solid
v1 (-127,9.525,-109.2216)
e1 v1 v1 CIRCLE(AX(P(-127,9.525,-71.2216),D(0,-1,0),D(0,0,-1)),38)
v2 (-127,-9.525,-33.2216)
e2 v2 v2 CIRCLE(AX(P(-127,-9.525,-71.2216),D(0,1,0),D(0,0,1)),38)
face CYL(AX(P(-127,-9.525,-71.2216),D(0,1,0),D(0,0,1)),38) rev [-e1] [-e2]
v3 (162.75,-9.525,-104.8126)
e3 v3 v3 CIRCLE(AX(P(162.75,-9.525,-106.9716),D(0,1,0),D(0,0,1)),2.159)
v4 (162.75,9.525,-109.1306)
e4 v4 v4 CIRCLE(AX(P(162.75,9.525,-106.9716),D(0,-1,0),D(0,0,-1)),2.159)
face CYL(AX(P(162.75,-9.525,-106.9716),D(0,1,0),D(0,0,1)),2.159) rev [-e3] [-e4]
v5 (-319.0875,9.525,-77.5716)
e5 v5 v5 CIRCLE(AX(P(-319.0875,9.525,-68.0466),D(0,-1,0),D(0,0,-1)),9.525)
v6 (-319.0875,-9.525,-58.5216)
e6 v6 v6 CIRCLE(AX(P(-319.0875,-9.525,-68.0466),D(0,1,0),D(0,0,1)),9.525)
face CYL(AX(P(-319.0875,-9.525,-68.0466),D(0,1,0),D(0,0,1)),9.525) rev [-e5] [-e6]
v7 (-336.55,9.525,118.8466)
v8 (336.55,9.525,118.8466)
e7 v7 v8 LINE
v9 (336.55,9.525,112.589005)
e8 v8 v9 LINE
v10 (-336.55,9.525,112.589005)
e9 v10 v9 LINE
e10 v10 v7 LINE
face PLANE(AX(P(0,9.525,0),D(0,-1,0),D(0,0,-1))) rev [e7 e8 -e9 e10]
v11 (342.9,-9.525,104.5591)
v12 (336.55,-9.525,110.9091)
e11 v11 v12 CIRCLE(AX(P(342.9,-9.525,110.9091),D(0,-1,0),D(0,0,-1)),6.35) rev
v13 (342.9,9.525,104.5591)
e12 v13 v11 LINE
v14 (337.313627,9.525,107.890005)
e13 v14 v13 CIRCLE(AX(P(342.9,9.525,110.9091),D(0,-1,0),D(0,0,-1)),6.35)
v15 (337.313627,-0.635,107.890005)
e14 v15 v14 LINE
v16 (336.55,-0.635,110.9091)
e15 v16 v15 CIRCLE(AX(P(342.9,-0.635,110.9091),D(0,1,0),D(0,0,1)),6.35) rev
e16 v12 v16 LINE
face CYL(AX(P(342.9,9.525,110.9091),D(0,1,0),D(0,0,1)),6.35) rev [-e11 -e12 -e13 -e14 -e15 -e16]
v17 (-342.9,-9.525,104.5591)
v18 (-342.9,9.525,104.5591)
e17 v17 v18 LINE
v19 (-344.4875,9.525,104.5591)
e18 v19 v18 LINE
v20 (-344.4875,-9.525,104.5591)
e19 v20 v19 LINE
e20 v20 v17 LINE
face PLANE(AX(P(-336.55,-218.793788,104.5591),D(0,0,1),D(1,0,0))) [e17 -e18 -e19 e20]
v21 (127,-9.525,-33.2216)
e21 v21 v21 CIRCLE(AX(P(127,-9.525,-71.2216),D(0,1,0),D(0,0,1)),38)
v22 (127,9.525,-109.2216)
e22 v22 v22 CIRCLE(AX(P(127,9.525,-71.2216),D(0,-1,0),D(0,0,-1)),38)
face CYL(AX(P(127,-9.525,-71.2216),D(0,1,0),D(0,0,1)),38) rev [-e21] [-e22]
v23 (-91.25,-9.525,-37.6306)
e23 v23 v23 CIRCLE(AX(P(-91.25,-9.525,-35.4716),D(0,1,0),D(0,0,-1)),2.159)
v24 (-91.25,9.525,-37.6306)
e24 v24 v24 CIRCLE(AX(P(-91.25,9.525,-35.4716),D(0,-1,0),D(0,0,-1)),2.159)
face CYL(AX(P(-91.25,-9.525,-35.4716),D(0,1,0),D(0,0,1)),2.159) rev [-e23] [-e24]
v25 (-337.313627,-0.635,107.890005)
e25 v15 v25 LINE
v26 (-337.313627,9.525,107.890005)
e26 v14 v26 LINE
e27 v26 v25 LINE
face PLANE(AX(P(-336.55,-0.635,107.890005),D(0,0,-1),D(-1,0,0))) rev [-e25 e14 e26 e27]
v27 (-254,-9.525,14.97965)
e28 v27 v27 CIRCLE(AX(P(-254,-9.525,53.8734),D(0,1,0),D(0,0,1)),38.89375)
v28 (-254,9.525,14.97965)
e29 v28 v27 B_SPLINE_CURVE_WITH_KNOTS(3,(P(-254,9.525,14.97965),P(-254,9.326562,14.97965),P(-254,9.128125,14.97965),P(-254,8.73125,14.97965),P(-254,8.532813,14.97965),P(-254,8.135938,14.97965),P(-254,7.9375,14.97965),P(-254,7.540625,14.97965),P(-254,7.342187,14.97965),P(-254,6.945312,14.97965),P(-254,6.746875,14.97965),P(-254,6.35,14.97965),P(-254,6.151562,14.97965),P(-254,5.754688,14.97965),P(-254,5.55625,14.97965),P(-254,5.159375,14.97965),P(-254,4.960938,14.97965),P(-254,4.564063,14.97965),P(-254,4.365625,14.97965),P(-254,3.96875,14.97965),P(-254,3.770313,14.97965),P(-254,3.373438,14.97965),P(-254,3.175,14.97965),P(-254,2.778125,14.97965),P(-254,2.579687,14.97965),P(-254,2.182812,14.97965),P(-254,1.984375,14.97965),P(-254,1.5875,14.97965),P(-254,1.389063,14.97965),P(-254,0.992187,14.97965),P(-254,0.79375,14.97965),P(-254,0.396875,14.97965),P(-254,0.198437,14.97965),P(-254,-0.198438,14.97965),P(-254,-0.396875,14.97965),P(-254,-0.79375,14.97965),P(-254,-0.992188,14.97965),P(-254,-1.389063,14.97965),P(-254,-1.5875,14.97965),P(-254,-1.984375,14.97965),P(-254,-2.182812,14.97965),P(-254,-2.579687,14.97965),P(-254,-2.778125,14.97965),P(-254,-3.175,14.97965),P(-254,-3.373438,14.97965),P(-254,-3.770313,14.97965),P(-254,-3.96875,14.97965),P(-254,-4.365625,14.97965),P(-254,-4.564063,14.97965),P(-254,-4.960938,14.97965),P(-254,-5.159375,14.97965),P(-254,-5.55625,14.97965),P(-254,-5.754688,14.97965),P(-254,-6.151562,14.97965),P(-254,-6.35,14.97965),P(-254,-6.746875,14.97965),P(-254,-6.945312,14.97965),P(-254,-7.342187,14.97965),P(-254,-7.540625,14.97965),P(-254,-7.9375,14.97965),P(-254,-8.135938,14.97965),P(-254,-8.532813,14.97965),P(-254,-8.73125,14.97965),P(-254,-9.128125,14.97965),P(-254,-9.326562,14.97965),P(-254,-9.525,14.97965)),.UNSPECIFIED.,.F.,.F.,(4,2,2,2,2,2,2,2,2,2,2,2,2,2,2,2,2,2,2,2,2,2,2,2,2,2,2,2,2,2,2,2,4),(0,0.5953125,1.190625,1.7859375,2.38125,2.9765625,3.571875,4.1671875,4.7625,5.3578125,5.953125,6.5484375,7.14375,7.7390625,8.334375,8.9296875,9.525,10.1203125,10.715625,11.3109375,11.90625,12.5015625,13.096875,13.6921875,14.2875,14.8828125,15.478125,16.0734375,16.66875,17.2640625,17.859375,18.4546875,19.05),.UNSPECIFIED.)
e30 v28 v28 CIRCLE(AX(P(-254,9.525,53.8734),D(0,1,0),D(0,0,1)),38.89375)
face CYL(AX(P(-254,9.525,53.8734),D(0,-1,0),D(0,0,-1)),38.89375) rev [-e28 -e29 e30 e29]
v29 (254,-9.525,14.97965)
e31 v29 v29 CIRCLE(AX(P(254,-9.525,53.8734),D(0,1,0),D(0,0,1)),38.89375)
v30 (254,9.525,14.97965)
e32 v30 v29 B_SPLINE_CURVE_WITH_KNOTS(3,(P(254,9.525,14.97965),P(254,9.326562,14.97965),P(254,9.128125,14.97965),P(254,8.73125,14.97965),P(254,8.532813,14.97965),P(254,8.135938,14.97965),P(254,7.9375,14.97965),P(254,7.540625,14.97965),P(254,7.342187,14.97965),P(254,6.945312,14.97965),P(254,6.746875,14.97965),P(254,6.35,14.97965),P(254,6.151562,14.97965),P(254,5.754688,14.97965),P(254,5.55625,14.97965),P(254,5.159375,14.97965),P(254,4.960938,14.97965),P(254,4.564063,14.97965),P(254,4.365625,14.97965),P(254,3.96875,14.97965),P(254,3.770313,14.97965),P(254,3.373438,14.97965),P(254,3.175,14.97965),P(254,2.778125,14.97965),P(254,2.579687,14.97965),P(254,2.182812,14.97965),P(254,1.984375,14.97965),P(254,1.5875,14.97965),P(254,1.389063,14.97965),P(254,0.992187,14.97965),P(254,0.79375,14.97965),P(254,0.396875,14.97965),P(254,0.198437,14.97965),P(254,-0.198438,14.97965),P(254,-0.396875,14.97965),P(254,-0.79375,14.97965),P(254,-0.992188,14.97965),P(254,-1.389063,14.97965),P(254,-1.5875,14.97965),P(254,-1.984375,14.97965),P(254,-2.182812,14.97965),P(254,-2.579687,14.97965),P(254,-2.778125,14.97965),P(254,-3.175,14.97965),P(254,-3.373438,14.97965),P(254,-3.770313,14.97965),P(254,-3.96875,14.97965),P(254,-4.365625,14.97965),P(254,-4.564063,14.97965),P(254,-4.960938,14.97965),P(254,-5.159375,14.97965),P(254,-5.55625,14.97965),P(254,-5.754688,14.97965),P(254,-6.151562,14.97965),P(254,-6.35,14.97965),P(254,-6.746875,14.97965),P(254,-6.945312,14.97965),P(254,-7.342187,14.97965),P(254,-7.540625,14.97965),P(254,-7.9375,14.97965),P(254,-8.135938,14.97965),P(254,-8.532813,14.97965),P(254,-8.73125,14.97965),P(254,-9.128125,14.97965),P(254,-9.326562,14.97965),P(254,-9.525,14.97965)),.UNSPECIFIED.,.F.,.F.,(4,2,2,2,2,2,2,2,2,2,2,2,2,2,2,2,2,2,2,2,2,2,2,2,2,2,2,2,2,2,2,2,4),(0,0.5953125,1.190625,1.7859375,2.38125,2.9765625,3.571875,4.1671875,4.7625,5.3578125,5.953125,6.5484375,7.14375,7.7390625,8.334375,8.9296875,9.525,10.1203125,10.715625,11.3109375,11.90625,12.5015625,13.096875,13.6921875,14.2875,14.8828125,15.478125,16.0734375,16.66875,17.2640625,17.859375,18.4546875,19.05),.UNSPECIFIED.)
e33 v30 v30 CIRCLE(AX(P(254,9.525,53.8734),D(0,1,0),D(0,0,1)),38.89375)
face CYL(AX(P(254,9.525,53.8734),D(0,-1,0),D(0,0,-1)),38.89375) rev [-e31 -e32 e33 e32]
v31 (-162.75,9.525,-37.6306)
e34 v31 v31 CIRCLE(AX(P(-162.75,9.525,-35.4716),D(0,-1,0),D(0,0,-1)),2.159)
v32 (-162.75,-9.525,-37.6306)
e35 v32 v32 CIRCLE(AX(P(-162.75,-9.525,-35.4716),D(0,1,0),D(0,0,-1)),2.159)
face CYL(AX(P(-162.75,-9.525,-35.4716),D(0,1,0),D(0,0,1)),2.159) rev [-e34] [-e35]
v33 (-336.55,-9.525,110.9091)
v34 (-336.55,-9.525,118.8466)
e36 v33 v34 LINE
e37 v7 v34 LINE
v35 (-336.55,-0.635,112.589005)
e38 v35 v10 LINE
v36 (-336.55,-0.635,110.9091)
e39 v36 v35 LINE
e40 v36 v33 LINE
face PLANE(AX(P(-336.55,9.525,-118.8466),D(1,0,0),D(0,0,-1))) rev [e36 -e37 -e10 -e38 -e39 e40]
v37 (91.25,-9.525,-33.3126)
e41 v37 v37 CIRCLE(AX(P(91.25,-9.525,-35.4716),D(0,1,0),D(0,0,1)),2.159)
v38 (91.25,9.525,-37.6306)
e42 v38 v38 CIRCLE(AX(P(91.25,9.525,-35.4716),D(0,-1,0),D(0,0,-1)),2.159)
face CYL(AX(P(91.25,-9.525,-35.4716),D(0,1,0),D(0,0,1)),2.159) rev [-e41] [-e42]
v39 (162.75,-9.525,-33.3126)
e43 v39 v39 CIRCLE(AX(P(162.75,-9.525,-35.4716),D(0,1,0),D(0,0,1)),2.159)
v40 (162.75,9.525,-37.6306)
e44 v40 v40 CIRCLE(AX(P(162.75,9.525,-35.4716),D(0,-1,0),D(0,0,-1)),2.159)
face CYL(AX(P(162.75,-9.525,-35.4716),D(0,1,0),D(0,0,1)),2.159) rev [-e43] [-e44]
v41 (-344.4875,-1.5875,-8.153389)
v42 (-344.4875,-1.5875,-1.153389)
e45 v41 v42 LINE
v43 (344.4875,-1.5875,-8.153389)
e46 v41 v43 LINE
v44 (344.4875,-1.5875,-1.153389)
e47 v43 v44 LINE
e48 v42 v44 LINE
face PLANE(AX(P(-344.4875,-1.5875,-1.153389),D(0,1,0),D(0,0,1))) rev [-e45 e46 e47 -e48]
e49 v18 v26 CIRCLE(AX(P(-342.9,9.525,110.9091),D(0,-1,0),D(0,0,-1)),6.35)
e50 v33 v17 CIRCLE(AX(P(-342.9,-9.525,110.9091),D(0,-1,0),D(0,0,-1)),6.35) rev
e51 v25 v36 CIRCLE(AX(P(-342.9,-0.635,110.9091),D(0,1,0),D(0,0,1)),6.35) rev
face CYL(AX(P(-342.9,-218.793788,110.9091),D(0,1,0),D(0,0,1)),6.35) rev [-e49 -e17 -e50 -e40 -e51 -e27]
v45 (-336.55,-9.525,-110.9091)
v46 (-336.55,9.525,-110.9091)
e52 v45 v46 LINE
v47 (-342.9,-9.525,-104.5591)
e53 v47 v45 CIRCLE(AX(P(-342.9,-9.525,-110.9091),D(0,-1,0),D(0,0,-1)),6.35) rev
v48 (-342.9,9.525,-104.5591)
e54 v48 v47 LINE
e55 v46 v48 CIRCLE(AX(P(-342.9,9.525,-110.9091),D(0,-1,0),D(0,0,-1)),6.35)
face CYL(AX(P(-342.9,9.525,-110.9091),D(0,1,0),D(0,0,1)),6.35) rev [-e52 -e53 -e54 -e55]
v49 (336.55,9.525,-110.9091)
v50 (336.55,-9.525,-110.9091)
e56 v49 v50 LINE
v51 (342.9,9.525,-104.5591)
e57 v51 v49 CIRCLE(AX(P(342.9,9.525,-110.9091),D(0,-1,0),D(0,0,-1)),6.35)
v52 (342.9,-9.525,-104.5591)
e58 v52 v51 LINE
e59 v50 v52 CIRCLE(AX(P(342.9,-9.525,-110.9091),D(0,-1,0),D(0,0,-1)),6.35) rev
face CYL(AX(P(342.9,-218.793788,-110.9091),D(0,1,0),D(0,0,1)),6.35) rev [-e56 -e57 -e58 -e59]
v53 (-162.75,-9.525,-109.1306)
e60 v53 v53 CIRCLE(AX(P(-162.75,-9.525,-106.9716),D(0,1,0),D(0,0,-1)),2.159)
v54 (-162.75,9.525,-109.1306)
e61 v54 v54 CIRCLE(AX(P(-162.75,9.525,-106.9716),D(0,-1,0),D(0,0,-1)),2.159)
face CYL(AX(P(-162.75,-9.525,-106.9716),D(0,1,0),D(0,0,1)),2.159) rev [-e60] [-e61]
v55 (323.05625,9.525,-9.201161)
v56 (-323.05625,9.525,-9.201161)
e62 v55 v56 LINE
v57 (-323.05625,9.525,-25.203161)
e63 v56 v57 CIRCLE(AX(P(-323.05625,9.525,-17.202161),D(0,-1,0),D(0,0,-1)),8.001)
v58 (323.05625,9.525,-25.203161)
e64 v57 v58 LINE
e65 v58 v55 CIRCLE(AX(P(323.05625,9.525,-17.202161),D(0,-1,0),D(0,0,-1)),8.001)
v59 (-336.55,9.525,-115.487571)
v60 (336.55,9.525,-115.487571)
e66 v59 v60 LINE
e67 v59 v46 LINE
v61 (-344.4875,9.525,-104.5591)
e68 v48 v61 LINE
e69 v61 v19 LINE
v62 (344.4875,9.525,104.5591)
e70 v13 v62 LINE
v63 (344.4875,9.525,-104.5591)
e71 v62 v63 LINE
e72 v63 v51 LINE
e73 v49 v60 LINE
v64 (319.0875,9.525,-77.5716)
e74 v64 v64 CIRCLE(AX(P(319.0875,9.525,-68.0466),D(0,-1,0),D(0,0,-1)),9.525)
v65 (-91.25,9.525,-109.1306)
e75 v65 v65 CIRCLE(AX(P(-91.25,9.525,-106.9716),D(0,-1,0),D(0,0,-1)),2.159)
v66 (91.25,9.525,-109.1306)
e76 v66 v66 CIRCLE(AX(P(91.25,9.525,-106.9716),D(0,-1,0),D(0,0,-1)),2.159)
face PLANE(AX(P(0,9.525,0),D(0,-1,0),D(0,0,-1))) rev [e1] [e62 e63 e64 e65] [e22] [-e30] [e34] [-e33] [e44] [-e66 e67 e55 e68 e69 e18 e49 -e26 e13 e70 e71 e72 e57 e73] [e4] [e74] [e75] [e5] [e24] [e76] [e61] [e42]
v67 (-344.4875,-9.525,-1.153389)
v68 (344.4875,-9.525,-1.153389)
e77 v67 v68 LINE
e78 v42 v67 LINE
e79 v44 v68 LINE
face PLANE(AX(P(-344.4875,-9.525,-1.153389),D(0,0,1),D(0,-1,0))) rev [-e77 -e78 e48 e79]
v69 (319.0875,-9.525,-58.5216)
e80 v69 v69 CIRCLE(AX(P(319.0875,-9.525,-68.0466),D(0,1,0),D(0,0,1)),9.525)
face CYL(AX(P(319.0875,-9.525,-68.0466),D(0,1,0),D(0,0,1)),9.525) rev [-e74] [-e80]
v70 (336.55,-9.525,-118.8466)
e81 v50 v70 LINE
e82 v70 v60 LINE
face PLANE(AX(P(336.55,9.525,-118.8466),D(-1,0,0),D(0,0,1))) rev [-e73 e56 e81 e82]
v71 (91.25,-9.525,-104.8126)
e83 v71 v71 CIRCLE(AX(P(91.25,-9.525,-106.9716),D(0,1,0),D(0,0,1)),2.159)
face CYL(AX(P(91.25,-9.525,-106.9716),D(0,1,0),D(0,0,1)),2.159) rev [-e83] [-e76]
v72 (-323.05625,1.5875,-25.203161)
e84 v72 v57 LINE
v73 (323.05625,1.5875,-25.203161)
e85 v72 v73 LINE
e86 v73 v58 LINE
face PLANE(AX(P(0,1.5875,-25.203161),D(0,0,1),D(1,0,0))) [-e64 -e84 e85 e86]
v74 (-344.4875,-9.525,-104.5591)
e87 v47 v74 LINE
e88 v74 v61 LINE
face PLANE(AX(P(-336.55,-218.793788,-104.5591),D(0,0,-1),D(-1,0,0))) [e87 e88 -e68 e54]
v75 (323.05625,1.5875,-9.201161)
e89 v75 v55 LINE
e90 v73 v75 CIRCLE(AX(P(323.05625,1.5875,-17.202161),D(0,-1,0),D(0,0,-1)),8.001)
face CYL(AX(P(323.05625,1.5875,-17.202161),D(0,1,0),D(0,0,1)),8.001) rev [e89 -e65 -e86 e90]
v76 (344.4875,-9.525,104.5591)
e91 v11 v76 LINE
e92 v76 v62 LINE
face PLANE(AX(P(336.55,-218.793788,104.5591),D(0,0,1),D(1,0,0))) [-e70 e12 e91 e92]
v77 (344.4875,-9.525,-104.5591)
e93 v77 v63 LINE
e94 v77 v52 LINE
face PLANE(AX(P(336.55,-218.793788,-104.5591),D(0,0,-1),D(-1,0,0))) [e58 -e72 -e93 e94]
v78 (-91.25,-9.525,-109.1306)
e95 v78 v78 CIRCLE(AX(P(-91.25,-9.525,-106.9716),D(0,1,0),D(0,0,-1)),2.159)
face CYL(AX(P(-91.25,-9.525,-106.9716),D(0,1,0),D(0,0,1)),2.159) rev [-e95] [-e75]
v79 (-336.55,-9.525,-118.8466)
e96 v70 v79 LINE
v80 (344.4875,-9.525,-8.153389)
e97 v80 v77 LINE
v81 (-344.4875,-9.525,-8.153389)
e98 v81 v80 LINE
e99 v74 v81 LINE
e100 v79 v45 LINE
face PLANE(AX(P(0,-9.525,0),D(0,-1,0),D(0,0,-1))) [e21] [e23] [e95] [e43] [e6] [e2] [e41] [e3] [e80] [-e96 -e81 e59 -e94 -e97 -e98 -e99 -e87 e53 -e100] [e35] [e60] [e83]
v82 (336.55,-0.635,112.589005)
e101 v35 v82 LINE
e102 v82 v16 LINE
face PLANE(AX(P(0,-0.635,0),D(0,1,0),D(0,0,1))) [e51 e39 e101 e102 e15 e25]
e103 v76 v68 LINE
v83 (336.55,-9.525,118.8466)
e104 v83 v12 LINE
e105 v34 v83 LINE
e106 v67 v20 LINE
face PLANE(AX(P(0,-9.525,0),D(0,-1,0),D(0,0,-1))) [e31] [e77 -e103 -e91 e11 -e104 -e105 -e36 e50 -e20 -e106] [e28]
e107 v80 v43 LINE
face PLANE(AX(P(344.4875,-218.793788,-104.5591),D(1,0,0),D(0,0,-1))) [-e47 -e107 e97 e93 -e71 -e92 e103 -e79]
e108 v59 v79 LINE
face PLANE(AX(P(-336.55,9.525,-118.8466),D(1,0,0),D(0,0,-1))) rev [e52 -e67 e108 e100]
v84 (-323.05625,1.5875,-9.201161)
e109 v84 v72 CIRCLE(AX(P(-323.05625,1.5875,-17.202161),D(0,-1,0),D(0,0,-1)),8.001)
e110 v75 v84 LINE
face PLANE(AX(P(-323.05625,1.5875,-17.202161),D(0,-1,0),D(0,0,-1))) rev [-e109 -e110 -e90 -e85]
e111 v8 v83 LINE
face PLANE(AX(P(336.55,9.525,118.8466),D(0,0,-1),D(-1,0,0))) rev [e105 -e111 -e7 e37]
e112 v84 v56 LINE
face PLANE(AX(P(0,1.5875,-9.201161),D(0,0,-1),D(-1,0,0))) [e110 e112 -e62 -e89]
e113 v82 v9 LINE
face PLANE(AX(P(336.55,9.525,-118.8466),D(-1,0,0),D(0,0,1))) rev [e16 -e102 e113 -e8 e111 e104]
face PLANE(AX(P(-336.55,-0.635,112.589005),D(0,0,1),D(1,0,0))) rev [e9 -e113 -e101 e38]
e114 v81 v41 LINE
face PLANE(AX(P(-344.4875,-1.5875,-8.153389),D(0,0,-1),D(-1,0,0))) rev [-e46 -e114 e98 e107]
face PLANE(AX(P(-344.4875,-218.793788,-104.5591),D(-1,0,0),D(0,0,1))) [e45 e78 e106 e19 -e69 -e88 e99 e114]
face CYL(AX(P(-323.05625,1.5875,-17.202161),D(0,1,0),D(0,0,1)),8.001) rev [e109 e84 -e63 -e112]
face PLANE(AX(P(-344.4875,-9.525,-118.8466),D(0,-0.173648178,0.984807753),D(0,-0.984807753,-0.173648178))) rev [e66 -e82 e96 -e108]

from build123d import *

# Parameters (mm, degrees)
SKETCH1_W               = 673.1
SKETCH1_H               = 237.6932
SKETCH1_R               = 38.89375
BOSS_EXTRUDE1_DEPTH     = 9.525
SKETCH2_W               = 673.1
SKETCH2_H               = 4.699
CUT_EXTRUDE1_DEPTH      = 10.16
SKETCH3_W               = 7.9375
SKETCH3_H               = 209.1182
BOSS_EXTRUDE2_DEPTH     = 19.05
FILLET1_R               = 6.35
CUT_EXTRUDE2_DEPTH      = 692.395195502
CUT_EXTRUDE2_DEPTH_BACK = 692.395195502
CUT_EXTRUDE3_START      = -19.05
CUT_EXTRUDE3_DEPTH      = 7.9375
CUT_EXTRUDE4_DEPTH      = 365.9096525
CUT_EXTRUDE4_DEPTH_BACK = 365.9096525
SKETCH6_R               = 9.525
SKETCH6_R_2             = 38
SKETCH6_R_3             = 2.159
CUT_EXTRUDE5_DEPTH      = 365.536524388
CUT_EXTRUDE5_DEPTH_BACK = 365.536524388
SKETCH8_W               = 7
SKETCH8_H               = 7.9375


with BuildPart() as part:
    # Sketch1 → Boss-Extrude1 (new, symmetric)
    with BuildSketch(Plane(origin=(0, 0, 0), x_dir=(1, 0, 0), z_dir=(0, 1, 0))):
        Rectangle(SKETCH1_W, SKETCH1_H)
        with Locations(Location((-254, -53.8734, 0), (0, 0, 90))):
            Circle(SKETCH1_R, mode=Mode.SUBTRACT)
        with Locations(Location((254, -53.8734, 0), (0, 0, 90))):
            Circle(SKETCH1_R, mode=Mode.SUBTRACT)
    extrude(amount=BOSS_EXTRUDE1_DEPTH, both=True)

    # Sketch2 → Cut-Extrude1 (cut)
    with BuildSketch(Plane(origin=(0, 9.525, 0), x_dir=(1, 0, 0), z_dir=(0, 1, 0))):
        with Locations((0, -110.2395052)):
            Rectangle(SKETCH2_W, SKETCH2_H)
    extrude(amount=-CUT_EXTRUDE1_DEPTH, mode=Mode.SUBTRACT)

    # Sketch3 → Boss-Extrude2 (add)
    with BuildSketch(Plane(origin=(0, 9.525, 0), x_dir=(1, 0, 0), z_dir=(0, 1, 0))):
        with Locations((-340.51875, 0)):
            Rectangle(SKETCH3_W, SKETCH3_H)
        with Locations((340.51875, 0)):
            Rectangle(SKETCH3_W, SKETCH3_H)
    extrude(amount=-BOSS_EXTRUDE2_DEPTH)

    # Fillet1
    # the kernel refuses this fillet: 6.35 mm, written as the material it adds along each edge
    with BuildSketch(Plane(origin=(336.55, 9.525, -104.5591), x_dir=(0, 0, -1), z_dir=(0, -1, 0))) as fillet1_piece_1:
        with BuildLine():
            CenterArc((FILLET1_R, FILLET1_R), FILLET1_R, 180, 90)
            Line((0, FILLET1_R), (0, 0))
            Line((0, 0), (FILLET1_R, 0))
        make_face()
    extrude(amount=19.05)
    with BuildSketch(Plane(origin=(336.55, 9.525, 104.5591), x_dir=(0, 0, 1), z_dir=(0, -1, 0))) as fillet1_piece_2_section:
        with BuildLine():
            CenterArc((FILLET1_R, -FILLET1_R), FILLET1_R, 90, 90)
            Line((0, -FILLET1_R), (0, 0))
            Line((0, 0), (FILLET1_R, 0))
        make_face()
    fillet1_piece_2 = extrude(amount=19.05, mode=Mode.PRIVATE)
    fillet1_piece_2 = split(fillet1_piece_2, bisect_by=Plane(origin=(338.149651187, -0.635, 105.638113303), z_dir=(0, 1, 0)), keep=Keep.TOP, mode=Mode.PRIVATE)
    fillet1_piece_2 = split(fillet1_piece_2, bisect_by=Plane(origin=(338.149651187, 4.445, 107.8900052), z_dir=(0, 0, -1)), keep=Keep.TOP, mode=Mode.PRIVATE)
    add(fillet1_piece_2)
    with BuildSketch(Plane(origin=(336.55, 9.525, 104.5591), x_dir=(0, 0, 1), z_dir=(0, -1, 0))) as fillet1_piece_3_section:
        with BuildLine():
            CenterArc((FILLET1_R, -FILLET1_R), FILLET1_R, 90, 90)
            Line((0, -FILLET1_R), (0, 0))
            Line((0, 0), (FILLET1_R, 0))
        make_face()
    fillet1_piece_3 = extrude(amount=19.05, mode=Mode.PRIVATE)
    fillet1_piece_3 = split(fillet1_piece_3, bisect_by=Plane(origin=(336.678320254, -0.635, 108.894134697), z_dir=(0, -1, 0)), keep=Keep.TOP, mode=Mode.PRIVATE)
    fillet1_piece_3 = split(fillet1_piece_3, bisect_by=Plane(origin=(336.678320254, -5.08, 107.8900052), z_dir=(0, 0, 1)), keep=Keep.TOP, mode=Mode.PRIVATE)
    add(fillet1_piece_3)
    with BuildSketch(Plane(origin=(336.55, 9.525, 104.5591), x_dir=(0, 0, 1), z_dir=(0, -1, 0))) as fillet1_piece_4_section:
        with BuildLine():
            CenterArc((FILLET1_R, -FILLET1_R), FILLET1_R, 90, 90)
            Line((0, -FILLET1_R), (0, 0))
            Line((0, 0), (FILLET1_R, 0))
        make_face()
    fillet1_piece_4 = extrude(amount=19.05, mode=Mode.PRIVATE)
    fillet1_piece_4 = split(fillet1_piece_4, bisect_by=Plane(origin=(338.149651187, -0.635, 105.638113303), z_dir=(0, -1, 0)), keep=Keep.TOP, mode=Mode.PRIVATE)
    fillet1_piece_4 = split(fillet1_piece_4, bisect_by=Plane(origin=(338.149651187, -5.08, 107.8900052), z_dir=(0, 0, -1)), keep=Keep.TOP, mode=Mode.PRIVATE)
    add(fillet1_piece_4)
    with BuildSketch(Plane(origin=(-336.55, 9.525, -104.5591), x_dir=(0, 0, -1), z_dir=(0, -1, 0))) as fillet1_piece_5:
        with BuildLine():
            CenterArc((FILLET1_R, -FILLET1_R), FILLET1_R, 90, 90)
            Line((0, -FILLET1_R), (0, 0))
            Line((0, 0), (FILLET1_R, 0))
        make_face()
    extrude(amount=19.05)
    with BuildSketch(Plane(origin=(-336.55, 9.525, 104.5591), x_dir=(0, 0, 1), z_dir=(0, -1, 0))) as fillet1_piece_6_section:
        with BuildLine():
            CenterArc((FILLET1_R, FILLET1_R), FILLET1_R, 180, 90)
            Line((0, FILLET1_R), (0, 0))
            Line((0, 0), (FILLET1_R, 0))
        make_face()
    fillet1_piece_6 = extrude(amount=19.05, mode=Mode.PRIVATE)
    fillet1_piece_6 = split(fillet1_piece_6, bisect_by=Plane(origin=(-338.149651187, 4.445, 107.8900052), z_dir=(0, 0, -1)), keep=Keep.TOP, mode=Mode.PRIVATE)
    fillet1_piece_6 = split(fillet1_piece_6, bisect_by=Plane(origin=(-338.149651187, -0.635, 105.638113303), z_dir=(0, 1, 0)), keep=Keep.TOP, mode=Mode.PRIVATE)
    add(fillet1_piece_6)
    with BuildSketch(Plane(origin=(-336.55, 9.525, 104.5591), x_dir=(0, 0, 1), z_dir=(0, -1, 0))) as fillet1_piece_7_section:
        with BuildLine():
            CenterArc((FILLET1_R, FILLET1_R), FILLET1_R, 180, 90)
            Line((0, FILLET1_R), (0, 0))
            Line((0, 0), (FILLET1_R, 0))
        make_face()
    fillet1_piece_7 = extrude(amount=19.05, mode=Mode.PRIVATE)
    fillet1_piece_7 = split(fillet1_piece_7, bisect_by=Plane(origin=(-336.678320254, -5.08, 107.8900052), z_dir=(0, 0, 1)), keep=Keep.TOP, mode=Mode.PRIVATE)
    fillet1_piece_7 = split(fillet1_piece_7, bisect_by=Plane(origin=(-336.678320254, -0.635, 108.894134697), z_dir=(0, -1, 0)), keep=Keep.TOP, mode=Mode.PRIVATE)
    add(fillet1_piece_7)
    with BuildSketch(Plane(origin=(-336.55, 9.525, 104.5591), x_dir=(0, 0, 1), z_dir=(0, -1, 0))) as fillet1_piece_8_section:
        with BuildLine():
            CenterArc((FILLET1_R, FILLET1_R), FILLET1_R, 180, 90)
            Line((0, FILLET1_R), (0, 0))
            Line((0, 0), (FILLET1_R, 0))
        make_face()
    fillet1_piece_8 = extrude(amount=19.05, mode=Mode.PRIVATE)
    fillet1_piece_8 = split(fillet1_piece_8, bisect_by=Plane(origin=(-338.149651187, -5.08, 107.8900052), z_dir=(0, 0, -1)), keep=Keep.TOP, mode=Mode.PRIVATE)
    fillet1_piece_8 = split(fillet1_piece_8, bisect_by=Plane(origin=(-338.149651187, -0.635, 105.638113303), z_dir=(0, -1, 0)), keep=Keep.TOP, mode=Mode.PRIVATE)
    add(fillet1_piece_8)

    # Sketch4 → Cut-Extrude2 (cut, two sides: drawn at the far end of the back side and taken through both)
    with BuildSketch(Plane(origin=(336.55, 0, 0), x_dir=(0, 0, -1), z_dir=(1, 0, 0)).offset(-CUT_EXTRUDE2_DEPTH_BACK)):
        Polygon((118.8466, -9.525), (115.487571018, 9.525), (118.8466, 9.525), align=None)
    extrude(amount=CUT_EXTRUDE2_DEPTH + CUT_EXTRUDE2_DEPTH_BACK, mode=Mode.SUBTRACT)

    # Sketch5 → Cut-Extrude3 (cut)
    with BuildSketch(Plane.XZ.offset(9.525).offset(CUT_EXTRUDE3_START)):
        with BuildLine():
            Line((-323.05625, -9.201160668), (323.05625, -9.201160668))
            ThreePointArc((323.05625, -9.201160668), (331.05725, -17.202160668), (323.05625, -25.203160668))
            Line((323.05625, -25.203160668), (-323.05625, -25.203160668))
            ThreePointArc((-323.05625, -25.203160668), (-331.05725, -17.202160668), (-323.05625, -9.201160668))
        make_face()
    extrude(amount=CUT_EXTRUDE3_DEPTH, mode=Mode.SUBTRACT)

    # Sketch6 → Cut-Extrude4 (cut, two sides: drawn at the far end of the back side and taken through both)
    with BuildSketch(Plane(origin=(0, 9.525, 0), x_dir=(1, 0, 0), z_dir=(0, 1, 0)).offset(-CUT_EXTRUDE4_DEPTH_BACK)):
        with Locations(Location((-319.0875, 68.0466, 0), (0, 0, 270))):
            Circle(SKETCH6_R)
        with Locations(Location((319.0875, 68.0466, 0), (0, 0, 270))):
            Circle(SKETCH6_R)
        with Locations(Location((127, 71.2216, 0), (0, 0, 270))):
            Circle(SKETCH6_R_2)
        with Locations(Location((-127, 71.2216, 0), (0, 0, 270))):
            Circle(SKETCH6_R_2)
        with Locations(Location((162.75, 106.9716, 0), (0, 0, 270))):
            Circle(SKETCH6_R_3)
        with Locations(Location((162.75, 35.4716, 0), (0, 0, 270))):
            Circle(SKETCH6_R_3)
        with Locations(Location((91.25, 35.4716, 0), (0, 0, 270))):
            Circle(SKETCH6_R_3)
        with Locations(Location((91.25, 106.9716, 0), (0, 0, 270))):
            Circle(SKETCH6_R_3)
        with Locations(Location((-91.25, 106.9716, 0), (0, 0, 90))):
            Circle(SKETCH6_R_3)
        with Locations(Location((-91.25, 35.4716, 0), (0, 0, 90))):
            Circle(SKETCH6_R_3)
        with Locations(Location((-162.75, 35.4716, 0), (0, 0, 90))):
            Circle(SKETCH6_R_3)
        with Locations(Location((-162.75, 106.9716, 0), (0, 0, 90))):
            Circle(SKETCH6_R_3)
    extrude(amount=CUT_EXTRUDE4_DEPTH + CUT_EXTRUDE4_DEPTH_BACK, mode=Mode.SUBTRACT)

    # Sketch8 → Cut-Extrude5 (cut, two sides: drawn at the far end of the back side and taken through both)
    with BuildSketch(Plane(origin=(0, 0, 0), x_dir=(0, 0, -1), z_dir=(1, 0, 0)).offset(-CUT_EXTRUDE5_DEPTH_BACK)):
        with Locations((4.6533886, -5.55625)):
            Rectangle(SKETCH8_W, SKETCH8_H)
    extrude(amount=CUT_EXTRUDE5_DEPTH + CUT_EXTRUDE5_DEPTH_BACK, mode=Mode.SUBTRACT)


solid = part.part
